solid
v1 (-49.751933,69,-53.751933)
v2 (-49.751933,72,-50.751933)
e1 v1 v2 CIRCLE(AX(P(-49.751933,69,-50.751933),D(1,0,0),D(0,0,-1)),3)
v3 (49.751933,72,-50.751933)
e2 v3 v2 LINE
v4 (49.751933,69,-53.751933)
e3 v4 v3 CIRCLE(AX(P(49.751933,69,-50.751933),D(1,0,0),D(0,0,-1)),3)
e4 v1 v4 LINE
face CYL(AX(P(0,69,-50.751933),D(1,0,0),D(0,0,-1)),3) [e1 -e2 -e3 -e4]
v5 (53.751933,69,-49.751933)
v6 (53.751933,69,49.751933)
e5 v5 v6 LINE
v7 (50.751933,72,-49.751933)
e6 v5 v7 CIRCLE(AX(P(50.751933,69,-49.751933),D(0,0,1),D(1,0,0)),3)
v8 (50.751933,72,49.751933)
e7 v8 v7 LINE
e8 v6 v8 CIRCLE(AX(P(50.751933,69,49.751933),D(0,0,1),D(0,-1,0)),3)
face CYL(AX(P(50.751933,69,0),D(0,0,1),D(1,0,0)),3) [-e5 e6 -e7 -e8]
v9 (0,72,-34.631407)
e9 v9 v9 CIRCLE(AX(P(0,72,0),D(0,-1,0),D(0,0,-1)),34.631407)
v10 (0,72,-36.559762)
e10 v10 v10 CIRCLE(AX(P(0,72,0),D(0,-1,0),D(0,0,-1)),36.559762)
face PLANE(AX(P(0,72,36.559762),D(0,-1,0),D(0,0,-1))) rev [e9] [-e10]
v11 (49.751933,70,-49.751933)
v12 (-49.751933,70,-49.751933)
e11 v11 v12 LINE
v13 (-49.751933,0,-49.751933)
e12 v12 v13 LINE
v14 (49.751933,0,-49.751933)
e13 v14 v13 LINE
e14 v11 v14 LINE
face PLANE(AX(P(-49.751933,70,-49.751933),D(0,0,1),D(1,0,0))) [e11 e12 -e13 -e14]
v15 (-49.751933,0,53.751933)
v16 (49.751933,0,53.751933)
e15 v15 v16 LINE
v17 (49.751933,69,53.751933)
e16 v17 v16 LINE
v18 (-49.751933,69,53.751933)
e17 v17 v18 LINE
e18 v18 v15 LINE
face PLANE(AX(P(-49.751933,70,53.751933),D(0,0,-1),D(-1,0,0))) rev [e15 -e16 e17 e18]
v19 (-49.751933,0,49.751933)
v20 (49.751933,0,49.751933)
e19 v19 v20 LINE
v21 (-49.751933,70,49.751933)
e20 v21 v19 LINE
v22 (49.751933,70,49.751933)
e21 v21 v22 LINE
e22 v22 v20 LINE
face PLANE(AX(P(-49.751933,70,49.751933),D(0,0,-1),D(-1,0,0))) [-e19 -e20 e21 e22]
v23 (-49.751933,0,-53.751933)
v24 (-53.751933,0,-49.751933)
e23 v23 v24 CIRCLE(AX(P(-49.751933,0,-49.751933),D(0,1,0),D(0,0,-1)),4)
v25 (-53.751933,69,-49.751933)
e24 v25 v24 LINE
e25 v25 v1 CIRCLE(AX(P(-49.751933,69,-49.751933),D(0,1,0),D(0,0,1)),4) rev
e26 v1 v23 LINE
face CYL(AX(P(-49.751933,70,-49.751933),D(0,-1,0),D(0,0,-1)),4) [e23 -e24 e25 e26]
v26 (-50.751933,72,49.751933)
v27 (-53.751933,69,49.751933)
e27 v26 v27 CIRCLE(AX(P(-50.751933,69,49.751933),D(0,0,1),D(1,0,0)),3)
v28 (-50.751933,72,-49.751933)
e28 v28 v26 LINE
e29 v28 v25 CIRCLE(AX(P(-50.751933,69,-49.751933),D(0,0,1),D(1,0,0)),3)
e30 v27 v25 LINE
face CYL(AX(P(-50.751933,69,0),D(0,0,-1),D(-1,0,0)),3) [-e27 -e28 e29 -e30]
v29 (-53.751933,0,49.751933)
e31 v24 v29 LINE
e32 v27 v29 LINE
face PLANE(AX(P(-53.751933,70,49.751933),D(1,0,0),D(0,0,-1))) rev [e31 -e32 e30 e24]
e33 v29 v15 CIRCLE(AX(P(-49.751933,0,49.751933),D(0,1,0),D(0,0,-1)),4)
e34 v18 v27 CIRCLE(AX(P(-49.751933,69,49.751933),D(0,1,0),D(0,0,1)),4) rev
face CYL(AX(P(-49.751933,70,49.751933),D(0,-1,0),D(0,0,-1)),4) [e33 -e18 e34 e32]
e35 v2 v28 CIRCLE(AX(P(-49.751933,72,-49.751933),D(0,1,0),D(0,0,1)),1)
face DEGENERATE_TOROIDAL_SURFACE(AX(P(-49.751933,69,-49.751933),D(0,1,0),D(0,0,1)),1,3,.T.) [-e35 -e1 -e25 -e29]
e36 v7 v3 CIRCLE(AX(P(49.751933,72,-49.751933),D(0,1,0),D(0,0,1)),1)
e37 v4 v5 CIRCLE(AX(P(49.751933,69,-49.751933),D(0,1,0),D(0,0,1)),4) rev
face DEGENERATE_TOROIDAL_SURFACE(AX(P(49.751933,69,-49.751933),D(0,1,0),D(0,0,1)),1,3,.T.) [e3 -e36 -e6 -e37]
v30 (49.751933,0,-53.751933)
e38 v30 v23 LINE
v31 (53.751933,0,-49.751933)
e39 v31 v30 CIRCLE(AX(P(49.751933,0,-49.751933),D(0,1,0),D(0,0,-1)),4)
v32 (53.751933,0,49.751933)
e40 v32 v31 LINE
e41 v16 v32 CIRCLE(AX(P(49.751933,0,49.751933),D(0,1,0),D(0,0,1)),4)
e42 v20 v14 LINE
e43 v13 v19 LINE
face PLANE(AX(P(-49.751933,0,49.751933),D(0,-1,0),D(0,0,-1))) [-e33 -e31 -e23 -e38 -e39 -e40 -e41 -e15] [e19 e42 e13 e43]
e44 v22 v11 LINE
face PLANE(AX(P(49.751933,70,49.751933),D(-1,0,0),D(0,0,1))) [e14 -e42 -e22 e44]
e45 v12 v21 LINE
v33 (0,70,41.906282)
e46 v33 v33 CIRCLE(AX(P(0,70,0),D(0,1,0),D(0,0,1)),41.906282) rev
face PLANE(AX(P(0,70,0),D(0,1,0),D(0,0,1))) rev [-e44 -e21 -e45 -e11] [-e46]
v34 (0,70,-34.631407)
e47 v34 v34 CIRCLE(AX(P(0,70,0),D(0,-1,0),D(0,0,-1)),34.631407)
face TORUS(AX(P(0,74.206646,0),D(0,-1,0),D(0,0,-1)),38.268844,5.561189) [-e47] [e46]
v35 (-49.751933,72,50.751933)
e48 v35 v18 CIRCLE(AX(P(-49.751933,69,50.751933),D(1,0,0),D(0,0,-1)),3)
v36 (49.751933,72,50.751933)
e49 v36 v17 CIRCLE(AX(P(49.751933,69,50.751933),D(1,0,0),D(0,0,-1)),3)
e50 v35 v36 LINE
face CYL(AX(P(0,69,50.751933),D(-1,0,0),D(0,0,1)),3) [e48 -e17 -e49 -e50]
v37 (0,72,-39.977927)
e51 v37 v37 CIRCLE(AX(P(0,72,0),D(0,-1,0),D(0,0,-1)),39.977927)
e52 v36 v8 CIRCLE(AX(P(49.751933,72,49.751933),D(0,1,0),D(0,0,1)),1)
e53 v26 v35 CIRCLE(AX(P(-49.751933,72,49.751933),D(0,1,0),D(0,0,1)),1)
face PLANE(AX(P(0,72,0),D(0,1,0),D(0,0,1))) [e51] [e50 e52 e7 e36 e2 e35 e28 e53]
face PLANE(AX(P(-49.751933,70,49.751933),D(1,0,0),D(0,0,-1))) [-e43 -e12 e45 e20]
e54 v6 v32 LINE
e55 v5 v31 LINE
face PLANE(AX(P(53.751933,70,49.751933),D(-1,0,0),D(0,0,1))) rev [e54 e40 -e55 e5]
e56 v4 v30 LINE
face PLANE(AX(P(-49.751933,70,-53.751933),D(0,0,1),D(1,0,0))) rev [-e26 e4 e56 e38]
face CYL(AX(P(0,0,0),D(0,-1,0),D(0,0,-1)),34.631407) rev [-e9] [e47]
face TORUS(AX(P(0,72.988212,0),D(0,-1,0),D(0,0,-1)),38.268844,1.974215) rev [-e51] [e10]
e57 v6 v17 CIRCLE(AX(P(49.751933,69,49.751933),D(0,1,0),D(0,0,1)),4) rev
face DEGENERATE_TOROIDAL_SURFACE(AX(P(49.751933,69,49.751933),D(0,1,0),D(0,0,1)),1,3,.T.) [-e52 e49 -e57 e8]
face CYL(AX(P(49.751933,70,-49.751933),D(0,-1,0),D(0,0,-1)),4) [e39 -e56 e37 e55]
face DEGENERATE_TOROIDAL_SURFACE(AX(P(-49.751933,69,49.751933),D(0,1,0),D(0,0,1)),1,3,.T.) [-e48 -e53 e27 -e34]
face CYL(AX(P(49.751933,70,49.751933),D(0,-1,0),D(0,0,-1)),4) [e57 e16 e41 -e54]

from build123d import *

# Parameters (mm, degrees)
SKETCH1_W           = 99.503865414
SKETCH1_H           = 99.503865414
BOSS_EXTRUDE1_DEPTH = 70
SKETCH2_R           = 41.055084084
BOSS_EXTRUDE2_DEPTH = 2
FILLET1_R           = 3


with BuildPart() as part:
    # Sketch1 → Boss-Extrude1 (new body)
    with BuildSketch(Plane(origin=(0, 0, 0), x_dir=(1, 0, 0), z_dir=(0, 1, 0))):
        with BuildLine():
            Line((-49.751932707, -53.751932707), (49.751932707, -53.751932707))
            ThreePointArc((49.751932707, -53.751932707), (52.580359832, -52.580359832), (53.751932707, -49.751932707))
            Line((53.751932707, -49.751932707), (53.751932707, 49.751932707))
            ThreePointArc((53.751932707, 49.751932707), (52.580359832, 52.580359832), (49.751932707, 53.751932707))
            Line((49.751932707, 53.751932707), (-49.751932707, 53.751932707))
            ThreePointArc((-49.751932707, 53.751932707), (-52.580359832, 52.580359832), (-53.751932707, 49.751932707))
            Line((-53.751932707, 49.751932707), (-53.751932707, -49.751932707))
            ThreePointArc((-53.751932707, -49.751932707), (-52.580359832, -52.580359832), (-49.751932707, -53.751932707))
        make_face()
        Rectangle(SKETCH1_W, SKETCH1_H, mode=Mode.SUBTRACT)
    extrude(amount=BOSS_EXTRUDE1_DEPTH)

    # Sketch2 → Boss-Extrude2 (add)
    with BuildSketch(Plane(origin=(0, 70, 0), x_dir=(1, 0, 0), z_dir=(0, 1, 0))):
        with BuildLine():
            Line((-49.751932707, -53.751932707), (49.751932707, -53.751932707))
            ThreePointArc((49.751932707, -53.751932707), (52.580359832, -52.580359832), (53.751932707, -49.751932707))
            Line((53.751932707, -49.751932707), (53.751932707, 49.751932707))
            ThreePointArc((53.751932707, 49.751932707), (52.580359832, 52.580359832), (49.751932707, 53.751932707))
            Line((49.751932707, 53.751932707), (-49.751932707, 53.751932707))
            ThreePointArc((-49.751932707, 53.751932707), (-52.580359832, 52.580359832), (-53.751932707, 49.751932707))
            Line((-53.751932707, 49.751932707), (-53.751932707, -49.751932707))
            ThreePointArc((-53.751932707, -49.751932707), (-52.580359832, -52.580359832), (-49.751932707, -53.751932707))
        make_face()
        Circle(SKETCH2_R, mode=Mode.SUBTRACT)
    extrude(amount=BOSS_EXTRUDE2_DEPTH)

    # Fillet1
    fillet1_edges = [part.edges().sort_by_distance(p)[0] for p in [
        (52.580359832, 72, 52.580359832),
        (0, 72, 53.751932707),
        (-52.580359832, 72, 52.580359832),
        (-53.751932707, 72, 0),
        (-52.580359832, 72, -52.580359832),
        (0, 72, -53.751932707),
        (52.580359832, 72, -52.580359832),
        (53.751932707, 72, 0),
    ]]
    fillet(fillet1_edges, radius=FILLET1_R)

    # Sketch6 → Revolve1 (revolve)
    with BuildSketch(Plane(origin=(0, 0, 0), x_dir=(0, 0, -1), z_dir=(1, 0, 0))):
        with BuildLine():
            Line((-41.906282127, 70), (-41.906282127, 72))
            Line((-41.906282127, 72), (-39.977926792, 72))
            ThreePointArc((-39.977926792, 72), (-38.268844469, 71.01399696), (-36.559762147, 72))
            Line((-36.559762147, 72), (-34.631406812, 72))
            Line((-34.631406812, 72), (-34.631406812, 70))
            ThreePointArc((-34.631406812, 70), (-38.268844469, 68.645456934), (-41.906282127, 70))
        make_face()
    revolve(axis=Axis((0, 0, 0), (0, 1, 0)))


solid = part.part
